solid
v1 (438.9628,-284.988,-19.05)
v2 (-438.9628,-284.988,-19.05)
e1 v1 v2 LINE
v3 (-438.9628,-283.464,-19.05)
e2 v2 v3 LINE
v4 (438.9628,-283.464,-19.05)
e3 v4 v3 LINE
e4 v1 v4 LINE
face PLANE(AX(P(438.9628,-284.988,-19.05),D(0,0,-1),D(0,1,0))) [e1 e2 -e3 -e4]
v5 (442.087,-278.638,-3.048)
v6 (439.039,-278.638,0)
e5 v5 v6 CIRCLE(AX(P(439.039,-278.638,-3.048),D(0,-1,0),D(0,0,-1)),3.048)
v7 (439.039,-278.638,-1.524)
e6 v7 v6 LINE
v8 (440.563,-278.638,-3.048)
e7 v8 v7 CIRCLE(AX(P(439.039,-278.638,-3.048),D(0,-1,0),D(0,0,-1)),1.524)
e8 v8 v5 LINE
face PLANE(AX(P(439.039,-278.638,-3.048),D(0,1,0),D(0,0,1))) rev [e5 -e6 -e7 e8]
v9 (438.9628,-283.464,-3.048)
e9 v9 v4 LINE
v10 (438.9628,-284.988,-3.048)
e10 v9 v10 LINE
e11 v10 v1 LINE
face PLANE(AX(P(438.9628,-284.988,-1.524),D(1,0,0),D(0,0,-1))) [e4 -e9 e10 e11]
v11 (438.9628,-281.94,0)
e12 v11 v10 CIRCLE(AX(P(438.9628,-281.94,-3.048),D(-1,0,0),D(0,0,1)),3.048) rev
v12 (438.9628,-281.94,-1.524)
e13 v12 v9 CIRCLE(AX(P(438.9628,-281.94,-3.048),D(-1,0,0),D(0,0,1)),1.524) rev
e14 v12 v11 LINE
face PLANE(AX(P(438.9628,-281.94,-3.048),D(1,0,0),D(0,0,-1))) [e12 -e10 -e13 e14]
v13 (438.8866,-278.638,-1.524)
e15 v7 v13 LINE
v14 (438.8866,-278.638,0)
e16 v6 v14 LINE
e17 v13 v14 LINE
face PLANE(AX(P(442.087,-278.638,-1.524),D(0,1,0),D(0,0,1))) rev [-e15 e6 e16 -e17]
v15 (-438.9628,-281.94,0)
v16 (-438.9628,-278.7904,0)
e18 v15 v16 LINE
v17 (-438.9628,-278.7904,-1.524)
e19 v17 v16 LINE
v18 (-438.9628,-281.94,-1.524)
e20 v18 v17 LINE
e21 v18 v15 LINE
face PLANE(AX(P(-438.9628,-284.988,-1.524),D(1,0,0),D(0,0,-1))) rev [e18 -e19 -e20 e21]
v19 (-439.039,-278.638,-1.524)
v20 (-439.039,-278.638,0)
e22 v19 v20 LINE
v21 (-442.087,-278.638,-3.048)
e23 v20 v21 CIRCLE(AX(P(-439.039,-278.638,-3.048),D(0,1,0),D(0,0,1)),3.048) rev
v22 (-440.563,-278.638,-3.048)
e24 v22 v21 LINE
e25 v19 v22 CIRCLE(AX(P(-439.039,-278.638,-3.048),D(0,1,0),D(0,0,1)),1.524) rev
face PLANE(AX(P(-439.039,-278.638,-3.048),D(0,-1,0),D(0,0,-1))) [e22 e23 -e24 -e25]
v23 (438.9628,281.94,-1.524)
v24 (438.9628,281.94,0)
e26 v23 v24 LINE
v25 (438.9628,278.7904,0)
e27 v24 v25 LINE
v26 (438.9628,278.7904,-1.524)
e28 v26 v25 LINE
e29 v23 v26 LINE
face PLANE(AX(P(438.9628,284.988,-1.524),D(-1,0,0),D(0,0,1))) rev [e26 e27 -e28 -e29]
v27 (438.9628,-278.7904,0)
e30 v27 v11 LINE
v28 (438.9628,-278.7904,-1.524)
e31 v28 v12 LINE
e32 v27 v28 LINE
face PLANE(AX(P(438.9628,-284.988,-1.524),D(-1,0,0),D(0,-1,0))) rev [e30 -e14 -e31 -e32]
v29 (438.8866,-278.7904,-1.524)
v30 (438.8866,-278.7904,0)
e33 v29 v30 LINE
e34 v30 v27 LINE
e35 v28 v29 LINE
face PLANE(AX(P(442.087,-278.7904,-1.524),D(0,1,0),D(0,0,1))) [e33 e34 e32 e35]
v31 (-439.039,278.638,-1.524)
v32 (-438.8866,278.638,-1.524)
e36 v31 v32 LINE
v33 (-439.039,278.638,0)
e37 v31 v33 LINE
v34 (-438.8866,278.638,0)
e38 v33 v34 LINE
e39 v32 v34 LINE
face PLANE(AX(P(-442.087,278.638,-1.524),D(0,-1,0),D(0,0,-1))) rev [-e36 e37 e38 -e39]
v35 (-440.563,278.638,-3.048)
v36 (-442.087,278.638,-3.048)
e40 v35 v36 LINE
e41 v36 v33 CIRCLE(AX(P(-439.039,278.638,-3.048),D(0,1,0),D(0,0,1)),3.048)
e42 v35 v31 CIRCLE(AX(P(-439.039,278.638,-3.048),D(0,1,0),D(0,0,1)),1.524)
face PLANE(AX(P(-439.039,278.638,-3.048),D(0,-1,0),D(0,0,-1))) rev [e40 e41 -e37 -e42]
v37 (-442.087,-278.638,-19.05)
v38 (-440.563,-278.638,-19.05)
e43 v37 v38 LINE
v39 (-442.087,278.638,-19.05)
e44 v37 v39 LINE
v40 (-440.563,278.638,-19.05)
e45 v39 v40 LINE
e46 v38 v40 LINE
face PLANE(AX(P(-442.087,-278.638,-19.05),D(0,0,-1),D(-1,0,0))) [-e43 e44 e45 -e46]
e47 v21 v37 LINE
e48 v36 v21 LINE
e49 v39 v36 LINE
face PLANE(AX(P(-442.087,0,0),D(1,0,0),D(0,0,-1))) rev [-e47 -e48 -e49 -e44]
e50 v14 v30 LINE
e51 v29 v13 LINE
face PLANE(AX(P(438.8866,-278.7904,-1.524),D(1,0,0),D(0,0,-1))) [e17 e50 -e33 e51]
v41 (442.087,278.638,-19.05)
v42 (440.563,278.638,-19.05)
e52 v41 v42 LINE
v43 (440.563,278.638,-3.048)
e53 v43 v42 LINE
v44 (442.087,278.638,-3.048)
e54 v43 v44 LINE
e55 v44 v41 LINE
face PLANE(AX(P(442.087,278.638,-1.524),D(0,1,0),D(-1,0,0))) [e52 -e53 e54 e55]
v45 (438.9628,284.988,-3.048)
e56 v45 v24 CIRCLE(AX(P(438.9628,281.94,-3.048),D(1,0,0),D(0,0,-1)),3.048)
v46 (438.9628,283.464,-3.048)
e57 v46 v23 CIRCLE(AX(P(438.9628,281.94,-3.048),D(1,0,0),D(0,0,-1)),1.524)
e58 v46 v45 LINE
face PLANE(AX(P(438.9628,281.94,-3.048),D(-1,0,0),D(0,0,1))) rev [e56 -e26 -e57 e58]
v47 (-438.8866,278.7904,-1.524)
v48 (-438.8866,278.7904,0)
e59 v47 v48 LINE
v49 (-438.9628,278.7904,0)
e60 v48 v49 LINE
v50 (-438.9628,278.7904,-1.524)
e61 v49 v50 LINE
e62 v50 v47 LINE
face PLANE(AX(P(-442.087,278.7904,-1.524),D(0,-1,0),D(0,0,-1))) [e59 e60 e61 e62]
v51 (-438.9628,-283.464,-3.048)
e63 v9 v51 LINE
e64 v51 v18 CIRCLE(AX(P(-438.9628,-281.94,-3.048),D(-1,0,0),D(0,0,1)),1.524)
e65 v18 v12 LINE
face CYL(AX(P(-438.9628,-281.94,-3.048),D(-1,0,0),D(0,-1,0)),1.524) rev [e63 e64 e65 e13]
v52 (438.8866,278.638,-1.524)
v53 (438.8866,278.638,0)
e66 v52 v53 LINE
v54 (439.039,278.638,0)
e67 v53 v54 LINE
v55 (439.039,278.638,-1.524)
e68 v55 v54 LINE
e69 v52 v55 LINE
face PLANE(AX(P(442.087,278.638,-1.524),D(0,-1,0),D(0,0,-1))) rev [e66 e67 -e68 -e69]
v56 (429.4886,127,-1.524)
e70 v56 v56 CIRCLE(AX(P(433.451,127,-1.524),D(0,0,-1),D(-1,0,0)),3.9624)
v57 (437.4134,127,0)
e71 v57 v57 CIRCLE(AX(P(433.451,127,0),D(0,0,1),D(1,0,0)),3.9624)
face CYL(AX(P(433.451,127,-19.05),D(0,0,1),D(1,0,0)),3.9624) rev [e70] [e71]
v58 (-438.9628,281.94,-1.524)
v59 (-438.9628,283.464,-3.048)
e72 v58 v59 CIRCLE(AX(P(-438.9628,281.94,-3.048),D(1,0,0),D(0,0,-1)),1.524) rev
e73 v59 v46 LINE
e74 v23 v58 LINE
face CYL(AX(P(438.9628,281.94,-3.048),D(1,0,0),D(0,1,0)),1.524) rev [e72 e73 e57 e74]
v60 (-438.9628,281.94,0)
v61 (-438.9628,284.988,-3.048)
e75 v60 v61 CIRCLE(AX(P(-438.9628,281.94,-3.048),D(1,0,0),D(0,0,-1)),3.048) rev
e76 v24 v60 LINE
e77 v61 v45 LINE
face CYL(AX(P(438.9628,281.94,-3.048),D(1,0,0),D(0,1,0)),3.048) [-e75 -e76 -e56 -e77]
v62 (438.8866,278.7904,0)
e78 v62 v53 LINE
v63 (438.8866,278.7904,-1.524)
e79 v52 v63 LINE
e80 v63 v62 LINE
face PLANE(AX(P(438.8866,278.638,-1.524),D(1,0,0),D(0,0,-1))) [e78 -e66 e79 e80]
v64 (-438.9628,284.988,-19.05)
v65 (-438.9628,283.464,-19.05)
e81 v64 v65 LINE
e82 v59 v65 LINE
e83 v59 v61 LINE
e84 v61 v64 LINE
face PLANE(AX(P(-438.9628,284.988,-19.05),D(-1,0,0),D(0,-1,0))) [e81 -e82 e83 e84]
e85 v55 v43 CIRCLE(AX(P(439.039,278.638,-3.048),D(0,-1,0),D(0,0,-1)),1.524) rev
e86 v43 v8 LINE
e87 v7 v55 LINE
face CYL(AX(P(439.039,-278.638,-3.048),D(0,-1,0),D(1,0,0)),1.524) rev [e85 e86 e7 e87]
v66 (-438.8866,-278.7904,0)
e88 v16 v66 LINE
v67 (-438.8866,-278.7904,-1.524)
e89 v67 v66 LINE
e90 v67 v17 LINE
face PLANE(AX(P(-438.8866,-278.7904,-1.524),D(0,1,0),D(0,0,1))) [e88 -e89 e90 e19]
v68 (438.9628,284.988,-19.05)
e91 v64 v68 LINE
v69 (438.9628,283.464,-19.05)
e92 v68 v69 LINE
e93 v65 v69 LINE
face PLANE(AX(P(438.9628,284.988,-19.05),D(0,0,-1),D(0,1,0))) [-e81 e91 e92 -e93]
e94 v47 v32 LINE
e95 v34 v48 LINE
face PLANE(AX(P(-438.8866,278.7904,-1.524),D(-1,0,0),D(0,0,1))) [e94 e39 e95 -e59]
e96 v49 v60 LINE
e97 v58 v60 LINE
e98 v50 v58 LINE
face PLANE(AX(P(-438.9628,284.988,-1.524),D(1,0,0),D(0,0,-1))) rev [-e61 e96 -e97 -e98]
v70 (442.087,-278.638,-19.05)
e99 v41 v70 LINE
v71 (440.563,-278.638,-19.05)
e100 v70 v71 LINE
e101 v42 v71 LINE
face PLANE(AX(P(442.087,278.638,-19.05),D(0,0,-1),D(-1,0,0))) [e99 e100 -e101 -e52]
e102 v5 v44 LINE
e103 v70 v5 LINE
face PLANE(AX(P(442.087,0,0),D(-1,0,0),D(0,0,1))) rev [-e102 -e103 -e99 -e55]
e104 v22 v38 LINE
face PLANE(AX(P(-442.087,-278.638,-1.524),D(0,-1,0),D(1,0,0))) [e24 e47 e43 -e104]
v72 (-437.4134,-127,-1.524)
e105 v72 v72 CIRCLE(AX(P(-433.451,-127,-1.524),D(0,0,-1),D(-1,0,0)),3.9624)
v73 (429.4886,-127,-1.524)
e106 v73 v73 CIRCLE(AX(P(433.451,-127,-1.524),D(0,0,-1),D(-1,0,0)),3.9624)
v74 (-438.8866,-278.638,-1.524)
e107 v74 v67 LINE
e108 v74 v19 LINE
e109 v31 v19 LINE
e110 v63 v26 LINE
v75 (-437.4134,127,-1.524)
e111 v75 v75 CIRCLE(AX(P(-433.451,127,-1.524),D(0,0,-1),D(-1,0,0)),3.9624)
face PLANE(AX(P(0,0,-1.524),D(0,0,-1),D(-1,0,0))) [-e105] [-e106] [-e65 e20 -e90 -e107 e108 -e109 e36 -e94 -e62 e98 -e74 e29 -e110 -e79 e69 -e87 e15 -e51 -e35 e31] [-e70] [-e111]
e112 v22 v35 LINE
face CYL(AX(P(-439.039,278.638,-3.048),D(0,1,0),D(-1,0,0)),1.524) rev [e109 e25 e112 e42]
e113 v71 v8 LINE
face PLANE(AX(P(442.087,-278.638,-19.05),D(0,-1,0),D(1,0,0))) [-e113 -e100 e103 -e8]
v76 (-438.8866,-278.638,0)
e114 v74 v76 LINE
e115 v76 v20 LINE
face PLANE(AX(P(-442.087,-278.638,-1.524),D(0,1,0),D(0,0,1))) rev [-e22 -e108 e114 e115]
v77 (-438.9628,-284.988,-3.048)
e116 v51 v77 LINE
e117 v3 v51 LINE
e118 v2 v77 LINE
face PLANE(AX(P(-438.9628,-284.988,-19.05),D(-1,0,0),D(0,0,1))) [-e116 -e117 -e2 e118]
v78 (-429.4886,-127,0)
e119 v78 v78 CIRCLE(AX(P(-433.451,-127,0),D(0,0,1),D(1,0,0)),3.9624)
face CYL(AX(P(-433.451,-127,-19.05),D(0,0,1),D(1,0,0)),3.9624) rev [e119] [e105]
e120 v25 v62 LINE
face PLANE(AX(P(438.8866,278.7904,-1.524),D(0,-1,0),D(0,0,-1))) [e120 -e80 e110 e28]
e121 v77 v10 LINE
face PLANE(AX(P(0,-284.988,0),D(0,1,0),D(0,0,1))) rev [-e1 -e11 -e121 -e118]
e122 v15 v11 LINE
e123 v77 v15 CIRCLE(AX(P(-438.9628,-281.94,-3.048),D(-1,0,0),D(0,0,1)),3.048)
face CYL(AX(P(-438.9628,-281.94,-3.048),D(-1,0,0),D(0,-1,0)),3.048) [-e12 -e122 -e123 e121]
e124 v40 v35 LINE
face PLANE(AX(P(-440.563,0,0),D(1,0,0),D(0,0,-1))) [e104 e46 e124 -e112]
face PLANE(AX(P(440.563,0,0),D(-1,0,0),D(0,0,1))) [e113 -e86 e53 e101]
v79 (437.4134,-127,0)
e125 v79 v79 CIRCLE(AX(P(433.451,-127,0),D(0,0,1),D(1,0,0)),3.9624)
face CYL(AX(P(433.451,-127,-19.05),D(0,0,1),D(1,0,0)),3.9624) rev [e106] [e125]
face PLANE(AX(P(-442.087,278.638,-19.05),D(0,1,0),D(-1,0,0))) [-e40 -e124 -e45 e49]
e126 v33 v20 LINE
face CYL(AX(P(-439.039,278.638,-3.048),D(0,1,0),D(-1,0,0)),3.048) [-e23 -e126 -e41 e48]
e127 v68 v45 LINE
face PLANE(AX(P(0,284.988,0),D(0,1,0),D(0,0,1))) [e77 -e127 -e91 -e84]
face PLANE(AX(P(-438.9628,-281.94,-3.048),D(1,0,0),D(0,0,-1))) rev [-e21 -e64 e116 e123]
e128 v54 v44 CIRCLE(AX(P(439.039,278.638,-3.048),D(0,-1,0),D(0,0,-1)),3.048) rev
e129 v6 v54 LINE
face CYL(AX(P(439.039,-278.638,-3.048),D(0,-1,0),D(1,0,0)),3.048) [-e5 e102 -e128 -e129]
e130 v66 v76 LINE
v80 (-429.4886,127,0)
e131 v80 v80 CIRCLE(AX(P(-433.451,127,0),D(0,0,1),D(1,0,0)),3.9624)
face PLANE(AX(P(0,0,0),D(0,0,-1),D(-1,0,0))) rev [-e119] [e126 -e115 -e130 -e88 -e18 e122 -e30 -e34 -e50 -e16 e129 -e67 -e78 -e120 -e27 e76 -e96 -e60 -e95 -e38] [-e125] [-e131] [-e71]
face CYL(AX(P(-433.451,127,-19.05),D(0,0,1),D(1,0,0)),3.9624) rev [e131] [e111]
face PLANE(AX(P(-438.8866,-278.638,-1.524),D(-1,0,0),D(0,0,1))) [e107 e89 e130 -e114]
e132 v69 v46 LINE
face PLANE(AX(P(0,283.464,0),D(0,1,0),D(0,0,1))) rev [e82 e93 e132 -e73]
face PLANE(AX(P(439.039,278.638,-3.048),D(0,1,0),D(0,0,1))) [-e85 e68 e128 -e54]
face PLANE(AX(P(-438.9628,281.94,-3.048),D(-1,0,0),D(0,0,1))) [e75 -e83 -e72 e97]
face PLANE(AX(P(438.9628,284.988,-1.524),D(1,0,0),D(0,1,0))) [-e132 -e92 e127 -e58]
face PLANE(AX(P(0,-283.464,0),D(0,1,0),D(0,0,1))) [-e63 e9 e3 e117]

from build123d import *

# Parameters (mm, degrees)
CROQUIS1_W                   = 884.174
CROQUIS1_H                   = 569.976
BRIDA_BASE1_DEPTH            = 1.524
CROQUIS6_W                   = 3.1242
CROQUIS6_H                   = 6.35
CORTAR_EXTRUIR1_DEPTH        = 526.986119863
BRIDA_START                  = -438.9628
BRIDA_DE_ARISTA1_DEPTH       = 877.9256
BRIDA_START_2                = 6.35
BRIDA_DE_ARISTA1_2_DEPTH     = 557.276
BRIDA_DE_ARISTA1_3_DEPTH     = 877.9256
BRIDA_DE_ARISTA1_4_OUTLINE_W = 0.1524
BRIDA_DE_ARISTA1_4_OUTLINE_H = 1.524
BRIDA_DE_ARISTA1_4_DEPTH     = 0.0762
BRIDA_START_3                = 438.8866
BRIDA_DE_ARISTA1_5_OUTLINE_W = 0.1524
BRIDA_DE_ARISTA1_5_OUTLINE_H = 1.524
BRIDA_DE_ARISTA1_5_DEPTH     = 0.0762
BRIDA_DE_ARISTA1_6_DEPTH     = 557.276
CROQUIS19_R                  = 3.9624
CORTAR_EXTRUIR2_DEPTH        = 527.328773879


# Read off the part's stored shape, not the designer's step: Brida de arista1
# Sheet-metal steps are written as plain solids
with BuildPart() as part:
    # Croquis1 → Brida base1 (new body)
    with BuildSketch(Plane.XY):
        Rectangle(CROQUIS1_W, CROQUIS1_H)
    extrude(amount=-BRIDA_BASE1_DEPTH)

    # Croquis6 → Cortar-Extruir1 (cut, through all)
    with BuildSketch(Plane.XY):
        with Locations((440.5249, 281.813)):
            Rectangle(CROQUIS6_W, CROQUIS6_H)
        with Locations((-440.5249, 281.813)):
            Rectangle(CROQUIS6_W, CROQUIS6_H)
        with Locations((-440.5249, -281.813)):
            Rectangle(CROQUIS6_W, CROQUIS6_H)
        with Locations((440.5249, -281.813)):
            Rectangle(CROQUIS6_W, CROQUIS6_H)
    extrude(amount=-CORTAR_EXTRUIR1_DEPTH, mode=Mode.SUBTRACT)

    # Brida de arista1 outline → Brida de arista1 (add)
    with BuildSketch(Plane.YZ.offset(BRIDA_START)):
        with BuildLine():
            Line((284.988, -19.05), (284.988, -3.048))
            ThreePointArc((284.988, -3.048), (284.884141918, -2.259119551), (284.579645431, -1.524))
            Line((284.579645431, -1.524), (281.94, -1.524))
            ThreePointArc((281.94, -1.524), (283.017630735, -1.970369265), (283.464, -3.048))
            Line((283.464, -3.048), (283.464, -19.05))
            Line((283.464, -19.05), (284.988, -19.05))
        make_face()
        with BuildLine():
            ThreePointArc((-283.464, -3.048), (-283.017630735, -1.970369265), (-281.94, -1.524))
            Line((-281.94, -1.524), (-284.579645431, -1.524))
            ThreePointArc((-284.579645431, -1.524), (-284.884141918, -2.259119551), (-284.988, -3.048))
            Line((-284.988, -3.048), (-284.988, -19.05))
            Line((-284.988, -19.05), (-283.464, -19.05))
            Line((-283.464, -19.05), (-283.464, -3.048))
        make_face()
    extrude(amount=BRIDA_DE_ARISTA1_DEPTH)

    # Brida de arista1 2 outline → Brida de arista1 2 (add)
    with BuildSketch(Plane(origin=(0, 284.988, -1.524), x_dir=(-1, 0, 0), z_dir=(0, -1, 0)).offset(BRIDA_START_2)):
        with BuildLine():
            Line((-440.563, 1.524), (-440.563, 17.526))
            Line((-440.563, 17.526), (-442.087, 17.526))
            Line((-442.087, 17.526), (-442.087, 1.524))
            ThreePointArc((-442.087, 1.524), (-441.983141918, 0.735119551), (-441.678645431, 0))
            Line((-441.678645431, 0), (-439.039, 0))
            ThreePointArc((-439.039, 0), (-440.116630735, 0.446369265), (-440.563, 1.524))
        make_face()
        with BuildLine():
            ThreePointArc((440.563, 1.524), (440.116630735, 0.446369265), (439.039, 0))
            Line((439.039, 0), (441.678645431, 0))
            ThreePointArc((441.678645431, 0), (441.983141918, 0.735119551), (442.087, 1.524))
            Line((442.087, 1.524), (442.087, 17.526))
            Line((442.087, 17.526), (440.563, 17.526))
            Line((440.563, 17.526), (440.563, 1.524))
        make_face()
    extrude(amount=BRIDA_DE_ARISTA1_2_DEPTH)

    # Brida de arista1 3 outline → Brida de arista1 3 (cut)
    with BuildSketch(Plane.YZ.offset(BRIDA_START)):
        with BuildLine():
            ThreePointArc((281.94, 0), (283.464, -0.408354569), (284.579645431, -1.524))
            Line((284.579645431, -1.524), (284.988, -1.524))
            Line((284.988, -1.524), (284.988, 0))
            Line((284.988, 0), (281.94, 0))
        make_face()
        with BuildLine():
            ThreePointArc((-284.579645431, -1.524), (-283.464, -0.408354569), (-281.94, 0))
            Line((-281.94, 0), (-284.988, 0))
            Line((-284.988, 0), (-284.988, -1.524))
            Line((-284.988, -1.524), (-284.579645431, -1.524))
        make_face()
    extrude(amount=BRIDA_DE_ARISTA1_3_DEPTH, mode=Mode.SUBTRACT)

    # Brida de arista1 4 outline → Brida de arista1 4 (cut)
    with BuildSketch(Plane.YZ.offset(BRIDA_START)):
        with Locations((278.7142, -0.762)):
            Rectangle(BRIDA_DE_ARISTA1_4_OUTLINE_W, BRIDA_DE_ARISTA1_4_OUTLINE_H)
        with Locations((-278.7142, -0.762)):
            Rectangle(BRIDA_DE_ARISTA1_4_OUTLINE_W, BRIDA_DE_ARISTA1_4_OUTLINE_H)
    extrude(amount=BRIDA_DE_ARISTA1_4_DEPTH, mode=Mode.SUBTRACT)

    # Brida de arista1 5 outline → Brida de arista1 5 (cut)
    with BuildSketch(Plane.YZ.offset(BRIDA_START_3)):
        with Locations((278.7142, -0.762)):
            Rectangle(BRIDA_DE_ARISTA1_5_OUTLINE_W, BRIDA_DE_ARISTA1_5_OUTLINE_H)
        with Locations((-278.7142, -0.762)):
            Rectangle(BRIDA_DE_ARISTA1_5_OUTLINE_W, BRIDA_DE_ARISTA1_5_OUTLINE_H)
    extrude(amount=BRIDA_DE_ARISTA1_5_DEPTH, mode=Mode.SUBTRACT)

    # Brida de arista1 6 outline → Brida de arista1 6 (cut)
    with BuildSketch(Plane(origin=(0, 284.988, -1.524), x_dir=(-1, 0, 0), z_dir=(0, -1, 0)).offset(BRIDA_START_2)):
        with BuildLine():
            ThreePointArc((-439.039, -1.524), (-440.563, -1.115645431), (-441.678645431, 0))
            Line((-441.678645431, 0), (-442.087, 0))
            Line((-442.087, 0), (-442.087, -1.524))
            Line((-442.087, -1.524), (-439.039, -1.524))
        make_face()
        with BuildLine():
            Line((442.087, 0), (441.678645431, 0))
            ThreePointArc((441.678645431, 0), (440.563, -1.115645431), (439.039, -1.524))
            Line((439.039, -1.524), (442.087, -1.524))
            Line((442.087, -1.524), (442.087, 0))
        make_face()
    extrude(amount=BRIDA_DE_ARISTA1_6_DEPTH, mode=Mode.SUBTRACT)

    # Croquis19 → Cortar-Extruir2 (cut, through all)
    with BuildSketch(Plane.XY):
        with Locations((-433.451, 127)):
            Circle(CROQUIS19_R)
        with Locations((-433.451, -127)):
            Circle(CROQUIS19_R)
        with Locations((433.451, 127)):
            Circle(CROQUIS19_R)
        with Locations((433.451, -127)):
            Circle(CROQUIS19_R)
    extrude(amount=-CORTAR_EXTRUIR2_DEPTH, mode=Mode.SUBTRACT)


solid = part.part
